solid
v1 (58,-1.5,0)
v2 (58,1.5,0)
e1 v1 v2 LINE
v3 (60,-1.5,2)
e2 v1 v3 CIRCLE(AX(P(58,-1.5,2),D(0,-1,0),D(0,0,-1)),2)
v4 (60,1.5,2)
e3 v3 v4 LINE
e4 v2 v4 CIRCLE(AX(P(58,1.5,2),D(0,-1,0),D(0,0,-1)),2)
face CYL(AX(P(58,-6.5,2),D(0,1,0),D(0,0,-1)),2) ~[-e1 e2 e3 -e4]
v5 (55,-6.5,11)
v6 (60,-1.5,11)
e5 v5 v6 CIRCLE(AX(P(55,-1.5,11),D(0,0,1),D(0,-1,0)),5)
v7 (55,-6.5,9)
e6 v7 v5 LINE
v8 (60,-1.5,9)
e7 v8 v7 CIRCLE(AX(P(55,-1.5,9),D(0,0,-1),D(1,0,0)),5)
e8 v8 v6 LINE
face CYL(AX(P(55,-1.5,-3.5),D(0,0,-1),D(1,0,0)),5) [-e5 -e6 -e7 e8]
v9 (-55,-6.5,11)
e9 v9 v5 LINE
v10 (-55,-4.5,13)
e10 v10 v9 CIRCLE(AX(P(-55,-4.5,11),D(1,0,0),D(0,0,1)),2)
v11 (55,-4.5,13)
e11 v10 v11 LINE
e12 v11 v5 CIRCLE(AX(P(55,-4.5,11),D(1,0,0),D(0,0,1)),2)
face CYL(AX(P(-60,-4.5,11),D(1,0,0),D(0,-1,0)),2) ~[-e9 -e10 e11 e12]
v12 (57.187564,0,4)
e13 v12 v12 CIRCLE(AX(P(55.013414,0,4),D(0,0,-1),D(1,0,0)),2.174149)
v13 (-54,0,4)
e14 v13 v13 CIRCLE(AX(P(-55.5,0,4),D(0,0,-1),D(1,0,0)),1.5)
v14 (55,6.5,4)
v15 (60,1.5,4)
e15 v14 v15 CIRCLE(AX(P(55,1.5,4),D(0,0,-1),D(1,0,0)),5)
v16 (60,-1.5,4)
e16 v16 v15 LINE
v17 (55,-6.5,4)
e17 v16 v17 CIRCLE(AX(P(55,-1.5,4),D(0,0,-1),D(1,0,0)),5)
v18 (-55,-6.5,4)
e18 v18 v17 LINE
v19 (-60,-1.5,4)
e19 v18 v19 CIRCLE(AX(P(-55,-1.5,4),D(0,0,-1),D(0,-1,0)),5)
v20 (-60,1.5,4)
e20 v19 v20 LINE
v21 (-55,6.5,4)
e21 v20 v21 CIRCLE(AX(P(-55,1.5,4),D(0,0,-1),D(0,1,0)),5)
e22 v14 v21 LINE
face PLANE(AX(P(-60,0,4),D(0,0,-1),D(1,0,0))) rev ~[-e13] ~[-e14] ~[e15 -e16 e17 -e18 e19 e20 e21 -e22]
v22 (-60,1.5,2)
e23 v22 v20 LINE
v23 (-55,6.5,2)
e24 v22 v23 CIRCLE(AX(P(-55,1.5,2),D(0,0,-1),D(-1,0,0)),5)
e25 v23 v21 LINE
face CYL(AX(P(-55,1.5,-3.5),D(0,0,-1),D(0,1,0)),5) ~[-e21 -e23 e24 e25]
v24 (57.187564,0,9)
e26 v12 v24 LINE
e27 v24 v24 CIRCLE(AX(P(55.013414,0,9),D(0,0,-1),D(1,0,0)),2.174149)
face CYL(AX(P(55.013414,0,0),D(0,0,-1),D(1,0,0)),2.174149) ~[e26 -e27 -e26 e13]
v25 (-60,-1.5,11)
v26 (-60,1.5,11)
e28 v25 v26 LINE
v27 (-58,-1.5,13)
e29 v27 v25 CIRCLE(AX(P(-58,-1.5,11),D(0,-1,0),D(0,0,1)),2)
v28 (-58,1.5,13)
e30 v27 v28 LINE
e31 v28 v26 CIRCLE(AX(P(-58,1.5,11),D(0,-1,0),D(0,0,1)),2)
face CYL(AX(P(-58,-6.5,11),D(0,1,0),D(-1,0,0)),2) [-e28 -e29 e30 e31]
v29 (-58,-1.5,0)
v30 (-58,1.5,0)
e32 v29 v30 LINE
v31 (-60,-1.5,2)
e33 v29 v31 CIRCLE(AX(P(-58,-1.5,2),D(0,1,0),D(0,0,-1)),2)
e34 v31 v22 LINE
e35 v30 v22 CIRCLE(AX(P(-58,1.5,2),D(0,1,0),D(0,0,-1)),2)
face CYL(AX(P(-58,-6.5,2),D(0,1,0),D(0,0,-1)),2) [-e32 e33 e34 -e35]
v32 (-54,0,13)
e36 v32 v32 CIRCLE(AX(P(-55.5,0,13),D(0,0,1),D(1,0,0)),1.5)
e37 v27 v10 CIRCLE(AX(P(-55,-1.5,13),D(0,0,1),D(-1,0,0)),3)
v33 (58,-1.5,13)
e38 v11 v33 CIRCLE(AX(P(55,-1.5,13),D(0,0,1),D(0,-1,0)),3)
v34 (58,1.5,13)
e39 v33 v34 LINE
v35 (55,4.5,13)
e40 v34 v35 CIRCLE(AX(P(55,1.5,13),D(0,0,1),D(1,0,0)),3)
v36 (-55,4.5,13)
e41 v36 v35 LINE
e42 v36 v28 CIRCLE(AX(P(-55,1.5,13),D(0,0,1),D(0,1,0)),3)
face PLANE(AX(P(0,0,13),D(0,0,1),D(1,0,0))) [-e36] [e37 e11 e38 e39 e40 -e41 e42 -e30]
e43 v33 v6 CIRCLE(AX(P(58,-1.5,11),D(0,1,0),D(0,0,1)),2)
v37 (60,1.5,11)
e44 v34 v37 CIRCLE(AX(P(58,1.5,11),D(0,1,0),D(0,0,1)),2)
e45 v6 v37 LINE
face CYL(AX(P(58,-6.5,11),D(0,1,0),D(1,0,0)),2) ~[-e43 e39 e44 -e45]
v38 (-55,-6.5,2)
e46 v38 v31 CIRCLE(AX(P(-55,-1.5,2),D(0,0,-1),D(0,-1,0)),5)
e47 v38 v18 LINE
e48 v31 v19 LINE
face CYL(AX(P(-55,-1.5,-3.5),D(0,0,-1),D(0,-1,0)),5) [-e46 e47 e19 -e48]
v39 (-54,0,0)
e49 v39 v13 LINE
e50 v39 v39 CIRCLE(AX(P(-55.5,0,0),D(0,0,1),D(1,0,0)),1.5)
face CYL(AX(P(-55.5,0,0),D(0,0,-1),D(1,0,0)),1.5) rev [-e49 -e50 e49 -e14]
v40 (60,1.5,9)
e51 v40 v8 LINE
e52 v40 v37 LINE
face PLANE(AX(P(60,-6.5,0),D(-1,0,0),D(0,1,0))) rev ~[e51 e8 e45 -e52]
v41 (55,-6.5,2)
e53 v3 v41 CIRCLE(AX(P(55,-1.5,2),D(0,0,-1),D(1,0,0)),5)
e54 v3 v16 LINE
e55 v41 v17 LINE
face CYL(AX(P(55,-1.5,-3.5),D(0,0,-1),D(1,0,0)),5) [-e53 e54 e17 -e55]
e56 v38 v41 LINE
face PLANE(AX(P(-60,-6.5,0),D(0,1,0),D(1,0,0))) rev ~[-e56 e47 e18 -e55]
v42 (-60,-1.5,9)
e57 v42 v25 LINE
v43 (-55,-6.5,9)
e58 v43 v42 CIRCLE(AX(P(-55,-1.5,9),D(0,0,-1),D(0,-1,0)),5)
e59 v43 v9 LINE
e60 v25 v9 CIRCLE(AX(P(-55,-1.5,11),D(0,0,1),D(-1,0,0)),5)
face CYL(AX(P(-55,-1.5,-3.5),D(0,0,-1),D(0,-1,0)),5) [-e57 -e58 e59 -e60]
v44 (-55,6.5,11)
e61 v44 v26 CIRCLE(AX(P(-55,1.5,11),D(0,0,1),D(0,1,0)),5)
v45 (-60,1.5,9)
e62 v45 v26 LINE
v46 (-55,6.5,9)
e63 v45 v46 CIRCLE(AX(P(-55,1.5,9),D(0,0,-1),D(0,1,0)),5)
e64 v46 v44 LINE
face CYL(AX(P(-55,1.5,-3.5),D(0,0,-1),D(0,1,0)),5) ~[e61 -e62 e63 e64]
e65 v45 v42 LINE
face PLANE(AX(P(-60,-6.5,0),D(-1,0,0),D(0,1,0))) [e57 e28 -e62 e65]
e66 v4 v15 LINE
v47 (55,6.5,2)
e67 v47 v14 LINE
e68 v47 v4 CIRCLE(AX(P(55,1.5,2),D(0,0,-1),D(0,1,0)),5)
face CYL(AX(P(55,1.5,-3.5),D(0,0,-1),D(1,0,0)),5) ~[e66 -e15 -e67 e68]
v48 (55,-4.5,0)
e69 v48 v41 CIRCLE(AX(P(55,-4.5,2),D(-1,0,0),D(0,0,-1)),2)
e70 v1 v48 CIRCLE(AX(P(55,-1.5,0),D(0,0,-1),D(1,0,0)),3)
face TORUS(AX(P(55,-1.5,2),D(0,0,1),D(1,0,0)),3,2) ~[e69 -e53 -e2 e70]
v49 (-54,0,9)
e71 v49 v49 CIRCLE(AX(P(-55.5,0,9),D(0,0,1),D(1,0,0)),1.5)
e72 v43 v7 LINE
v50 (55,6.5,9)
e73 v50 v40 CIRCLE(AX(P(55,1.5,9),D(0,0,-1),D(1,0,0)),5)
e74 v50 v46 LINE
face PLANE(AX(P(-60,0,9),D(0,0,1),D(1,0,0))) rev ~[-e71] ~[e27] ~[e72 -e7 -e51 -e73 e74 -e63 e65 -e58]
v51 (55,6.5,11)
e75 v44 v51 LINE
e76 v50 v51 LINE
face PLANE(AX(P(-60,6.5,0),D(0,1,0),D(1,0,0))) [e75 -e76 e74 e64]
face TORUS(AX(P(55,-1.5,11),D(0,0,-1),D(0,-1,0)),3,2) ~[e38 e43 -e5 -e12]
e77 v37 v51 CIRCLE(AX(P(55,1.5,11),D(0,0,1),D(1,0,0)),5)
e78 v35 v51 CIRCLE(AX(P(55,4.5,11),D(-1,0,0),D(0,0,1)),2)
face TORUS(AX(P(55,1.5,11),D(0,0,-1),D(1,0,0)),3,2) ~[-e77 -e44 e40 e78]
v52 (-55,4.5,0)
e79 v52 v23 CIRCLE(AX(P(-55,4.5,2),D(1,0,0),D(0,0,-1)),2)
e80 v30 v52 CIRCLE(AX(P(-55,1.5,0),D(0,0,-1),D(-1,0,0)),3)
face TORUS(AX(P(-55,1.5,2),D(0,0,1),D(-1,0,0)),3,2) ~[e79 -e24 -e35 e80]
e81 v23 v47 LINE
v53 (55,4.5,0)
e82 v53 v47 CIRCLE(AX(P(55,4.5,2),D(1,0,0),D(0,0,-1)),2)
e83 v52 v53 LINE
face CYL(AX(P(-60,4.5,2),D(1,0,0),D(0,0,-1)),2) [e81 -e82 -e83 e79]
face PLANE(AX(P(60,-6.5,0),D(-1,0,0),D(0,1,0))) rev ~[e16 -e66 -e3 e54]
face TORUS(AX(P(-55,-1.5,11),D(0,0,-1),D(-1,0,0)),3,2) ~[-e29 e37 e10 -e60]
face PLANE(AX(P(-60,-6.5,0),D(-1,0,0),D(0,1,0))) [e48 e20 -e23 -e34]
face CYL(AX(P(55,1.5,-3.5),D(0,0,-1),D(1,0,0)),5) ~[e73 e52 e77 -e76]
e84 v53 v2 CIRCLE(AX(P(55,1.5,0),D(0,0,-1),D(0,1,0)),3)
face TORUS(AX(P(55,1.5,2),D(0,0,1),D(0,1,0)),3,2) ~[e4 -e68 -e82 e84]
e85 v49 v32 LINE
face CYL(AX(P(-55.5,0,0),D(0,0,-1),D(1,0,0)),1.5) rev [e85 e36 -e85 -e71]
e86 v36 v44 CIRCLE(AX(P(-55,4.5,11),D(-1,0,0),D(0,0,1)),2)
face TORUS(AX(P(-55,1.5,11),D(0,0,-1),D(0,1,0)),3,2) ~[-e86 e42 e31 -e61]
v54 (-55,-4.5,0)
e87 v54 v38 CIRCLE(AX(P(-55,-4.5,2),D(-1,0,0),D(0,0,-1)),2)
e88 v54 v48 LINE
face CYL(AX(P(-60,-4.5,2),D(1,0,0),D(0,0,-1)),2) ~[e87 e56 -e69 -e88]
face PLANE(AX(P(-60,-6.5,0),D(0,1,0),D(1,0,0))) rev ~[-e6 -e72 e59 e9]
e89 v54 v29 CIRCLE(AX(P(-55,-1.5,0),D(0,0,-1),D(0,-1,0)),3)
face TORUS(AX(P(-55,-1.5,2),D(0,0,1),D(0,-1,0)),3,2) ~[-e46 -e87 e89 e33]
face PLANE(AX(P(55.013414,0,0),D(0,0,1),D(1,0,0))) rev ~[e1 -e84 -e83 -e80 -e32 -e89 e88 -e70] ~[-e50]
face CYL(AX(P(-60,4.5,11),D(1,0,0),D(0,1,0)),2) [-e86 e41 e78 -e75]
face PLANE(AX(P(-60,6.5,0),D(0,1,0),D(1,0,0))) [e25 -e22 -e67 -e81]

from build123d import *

# Parameters (mm, degrees)
F0_W          = 120
F0_H          = 13
F0_R          = 1.5
F1_DEPTH      = 13
F2_W          = 120
F2_H          = 5
F3_DEPTH      = 8
F3_DEPTH_BACK = 8
F4_R          = 2.1741492727
F5_DEPTH      = 13
F6_R          = 2
F7_T1_DEPTH   = 16.5
F7_T3_DEPTH   = 16.5
F7_T6_ANGLE   = 90
F7_T8_ANGLE   = 90
F7_T10_ANGLE  = 90
F7_T12_ANGLE  = 90
F7_T14_ANGLE  = 90
F7_T16_ANGLE  = 90
F7_T18_ANGLE  = 90
F7_T20_ANGLE  = 90


# Not quite as in the source:
# - a fillet or chamfer that OpenCascade refuses, or shapes differently, is made with other operations: its cross-section is extruded or revolved along the edge and cut away or added


with BuildPart() as f1:
    # F0 (on Top) → F1 (new body)
    with BuildSketch(Plane.XY):
        Rectangle(F0_W, F0_H)
        with Locations((-55.5, 0)):
            Circle(F0_R, mode=Mode.SUBTRACT)
    extrude(amount=F1_DEPTH)

    # F2 (on Front) → F3 (cut, two sides)
    with BuildSketch(Plane.XZ) as f3_sk:
        with Locations((0, 6.5)):
            Rectangle(F2_W, F2_H)
    extrude(amount=-F3_DEPTH, mode=Mode.SUBTRACT)
    extrude(f3_sk.sketch, amount=F3_DEPTH_BACK, mode=Mode.SUBTRACT)

    # F4 (on Top) → F5 (join)
    with BuildSketch(Plane.XY):
        with Locations((55.0134144723, 0)):
            Circle(F4_R)
    extrude(amount=F5_DEPTH)

    # F6
    f6_edges = [f1.edges().sort_by_distance(p)[0] for p in [
        (0, -6.5, 13),
        (-60, 0, 13),
        (0, 6.5, 13),
        (60, 0, 13),
        (-60, 0, 0),
        (0, -6.5, 0),
        (60, 0, 0),
        (0, 6.5, 0),
    ]]
    fillet(f6_edges, radius=F6_R)

    # F7: fillet of radius 5 on 8 edges, made by hand

    # F7_s2 → F7_t1 (cut)
    with BuildSketch(Plane.XY.offset(-3.5)):
        with BuildLine():
            ThreePointArc((-55, -6.5), (-58.5355339059, -5.0355339059), (-60, -1.5))
            Line((-60, -1.5), (-60, -6.5))
            Line((-60, -6.5), (-55, -6.5))
        make_face()
        with BuildLine():
            ThreePointArc((-55, 6.5), (-58.5355339059, 5.0355339059), (-60, 1.5))
            Line((-60, 1.5), (-60, 6.5))
            Line((-60, 6.5), (-55, 6.5))
        make_face()
        with BuildLine():
            ThreePointArc((60, -1.5), (58.5355339059, -5.0355339059), (55, -6.5))
            Line((55, -6.5), (60, -6.5))
            Line((60, -6.5), (60, -1.5))
        make_face()
        with BuildLine():
            ThreePointArc((60, 1.5), (58.5355339059, 5.0355339059), (55, 6.5))
            Line((55, 6.5), (60, 6.5))
            Line((60, 6.5), (60, 1.5))
        make_face()
    extrude(amount=F7_T1_DEPTH, mode=Mode.SUBTRACT)

    # F7_s4 → F7_t3 (cut)
    with BuildSketch(Plane.XY):
        with BuildLine():
            ThreePointArc((-55, -6.5), (-58.5355339059, -5.0355339059), (-60, -1.5))
            Line((-60, -1.5), (-60, -6.5))
            Line((-60, -6.5), (-55, -6.5))
        make_face()
        with BuildLine():
            ThreePointArc((-55, 6.5), (-58.5355339059, 5.0355339059), (-60, 1.5))
            Line((-60, 1.5), (-60, 6.5))
            Line((-60, 6.5), (-55, 6.5))
        make_face()
        with BuildLine():
            ThreePointArc((60, -1.5), (58.5355339059, -5.0355339059), (55, -6.5))
            Line((55, -6.5), (60, -6.5))
            Line((60, -6.5), (60, -1.5))
        make_face()
        with BuildLine():
            ThreePointArc((60, 1.5), (58.5355339059, 5.0355339059), (55, 6.5))
            Line((55, 6.5), (60, 6.5))
            Line((60, 6.5), (60, 1.5))
        make_face()
    extrude(amount=F7_T3_DEPTH, mode=Mode.SUBTRACT)

    # F7_s5 → F7_t6 (revolve, cut)
    with BuildSketch(Plane.YZ.offset(55)):
        with BuildLine():
            ThreePointArc((4.5, 0), (5.9142135624, 0.5857864376), (6.5, 2))
            Line((6.5, 2), (6.5, 0))
            Line((6.5, 0), (4.5, 0))
        make_face()
    revolve(axis=Axis((55, 1.5, 0), (0, 0, -1)), revolution_arc=F7_T6_ANGLE, mode=Mode.SUBTRACT)

    # F7_s7 → F7_t8 (revolve, cut)
    with BuildSketch(Plane.XZ.offset(1.5)):
        with BuildLine():
            ThreePointArc((58, 0), (59.4142135624, 0.5857864376), (60, 2))
            Line((60, 2), (60, 0))
            Line((60, 0), (58, 0))
        make_face()
    revolve(axis=Axis((55, -1.5, 0), (0, 0, -1)), revolution_arc=F7_T8_ANGLE, mode=Mode.SUBTRACT)

    # F7_s9 → F7_t10 (revolve, cut)
    with BuildSketch(Plane.XZ.offset(-1.5)):
        with BuildLine():
            ThreePointArc((58, 13), (59.4142135624, 12.4142135624), (60, 11))
            Line((60, 11), (60, 13))
            Line((60, 13), (58, 13))
        make_face()
    revolve(axis=Axis((55, 1.5, 13), (0, 0, 1)), revolution_arc=F7_T10_ANGLE, mode=Mode.SUBTRACT)

    # F7_s11 → F7_t12 (revolve, cut)
    with BuildSketch(Plane.YZ.offset(55)):
        with BuildLine():
            ThreePointArc((-4.5, 13), (-5.9142135624, 12.4142135624), (-6.5, 11))
            Line((-6.5, 11), (-6.5, 13))
            Line((-6.5, 13), (-4.5, 13))
        make_face()
    revolve(axis=Axis((55, -1.5, 13), (0, 0, 1)), revolution_arc=F7_T12_ANGLE, mode=Mode.SUBTRACT)

    # F7_s13 → F7_t14 (revolve, cut)
    with BuildSketch(Plane.XZ.offset(-1.5)):
        with BuildLine():
            ThreePointArc((-58, 0), (-59.4142135624, 0.5857864376), (-60, 2))
            Line((-60, 2), (-60, 0))
            Line((-60, 0), (-58, 0))
        make_face()
    revolve(axis=Axis((-55, 1.5, 0), (0, 0, -1)), revolution_arc=F7_T14_ANGLE, mode=Mode.SUBTRACT)

    # F7_s15 → F7_t16 (revolve, cut)
    with BuildSketch(Plane.YZ.offset(-55)):
        with BuildLine():
            ThreePointArc((-4.5, 0), (-5.9142135624, 0.5857864376), (-6.5, 2))
            Line((-6.5, 2), (-6.5, 0))
            Line((-6.5, 0), (-4.5, 0))
        make_face()
    revolve(axis=Axis((-55, -1.5, 0), (0, 0, -1)), revolution_arc=F7_T16_ANGLE, mode=Mode.SUBTRACT)

    # F7_s17 → F7_t18 (revolve, cut)
    with BuildSketch(Plane.YZ.offset(-55)):
        with BuildLine():
            ThreePointArc((4.5, 13), (5.9142135624, 12.4142135624), (6.5, 11))
            Line((6.5, 11), (6.5, 13))
            Line((6.5, 13), (4.5, 13))
        make_face()
    revolve(axis=Axis((-55, 1.5, 13), (0, 0, 1)), revolution_arc=F7_T18_ANGLE, mode=Mode.SUBTRACT)

    # F7_s19 → F7_t20 (revolve, cut)
    with BuildSketch(Plane.XZ.offset(1.5)):
        with BuildLine():
            ThreePointArc((-58, 13), (-59.4142135624, 12.4142135624), (-60, 11))
            Line((-60, 11), (-60, 13))
            Line((-60, 13), (-58, 13))
        make_face()
    revolve(axis=Axis((-55, -1.5, 13), (0, 0, 1)), revolution_arc=F7_T20_ANGLE, mode=Mode.SUBTRACT)


solid = f1.part
